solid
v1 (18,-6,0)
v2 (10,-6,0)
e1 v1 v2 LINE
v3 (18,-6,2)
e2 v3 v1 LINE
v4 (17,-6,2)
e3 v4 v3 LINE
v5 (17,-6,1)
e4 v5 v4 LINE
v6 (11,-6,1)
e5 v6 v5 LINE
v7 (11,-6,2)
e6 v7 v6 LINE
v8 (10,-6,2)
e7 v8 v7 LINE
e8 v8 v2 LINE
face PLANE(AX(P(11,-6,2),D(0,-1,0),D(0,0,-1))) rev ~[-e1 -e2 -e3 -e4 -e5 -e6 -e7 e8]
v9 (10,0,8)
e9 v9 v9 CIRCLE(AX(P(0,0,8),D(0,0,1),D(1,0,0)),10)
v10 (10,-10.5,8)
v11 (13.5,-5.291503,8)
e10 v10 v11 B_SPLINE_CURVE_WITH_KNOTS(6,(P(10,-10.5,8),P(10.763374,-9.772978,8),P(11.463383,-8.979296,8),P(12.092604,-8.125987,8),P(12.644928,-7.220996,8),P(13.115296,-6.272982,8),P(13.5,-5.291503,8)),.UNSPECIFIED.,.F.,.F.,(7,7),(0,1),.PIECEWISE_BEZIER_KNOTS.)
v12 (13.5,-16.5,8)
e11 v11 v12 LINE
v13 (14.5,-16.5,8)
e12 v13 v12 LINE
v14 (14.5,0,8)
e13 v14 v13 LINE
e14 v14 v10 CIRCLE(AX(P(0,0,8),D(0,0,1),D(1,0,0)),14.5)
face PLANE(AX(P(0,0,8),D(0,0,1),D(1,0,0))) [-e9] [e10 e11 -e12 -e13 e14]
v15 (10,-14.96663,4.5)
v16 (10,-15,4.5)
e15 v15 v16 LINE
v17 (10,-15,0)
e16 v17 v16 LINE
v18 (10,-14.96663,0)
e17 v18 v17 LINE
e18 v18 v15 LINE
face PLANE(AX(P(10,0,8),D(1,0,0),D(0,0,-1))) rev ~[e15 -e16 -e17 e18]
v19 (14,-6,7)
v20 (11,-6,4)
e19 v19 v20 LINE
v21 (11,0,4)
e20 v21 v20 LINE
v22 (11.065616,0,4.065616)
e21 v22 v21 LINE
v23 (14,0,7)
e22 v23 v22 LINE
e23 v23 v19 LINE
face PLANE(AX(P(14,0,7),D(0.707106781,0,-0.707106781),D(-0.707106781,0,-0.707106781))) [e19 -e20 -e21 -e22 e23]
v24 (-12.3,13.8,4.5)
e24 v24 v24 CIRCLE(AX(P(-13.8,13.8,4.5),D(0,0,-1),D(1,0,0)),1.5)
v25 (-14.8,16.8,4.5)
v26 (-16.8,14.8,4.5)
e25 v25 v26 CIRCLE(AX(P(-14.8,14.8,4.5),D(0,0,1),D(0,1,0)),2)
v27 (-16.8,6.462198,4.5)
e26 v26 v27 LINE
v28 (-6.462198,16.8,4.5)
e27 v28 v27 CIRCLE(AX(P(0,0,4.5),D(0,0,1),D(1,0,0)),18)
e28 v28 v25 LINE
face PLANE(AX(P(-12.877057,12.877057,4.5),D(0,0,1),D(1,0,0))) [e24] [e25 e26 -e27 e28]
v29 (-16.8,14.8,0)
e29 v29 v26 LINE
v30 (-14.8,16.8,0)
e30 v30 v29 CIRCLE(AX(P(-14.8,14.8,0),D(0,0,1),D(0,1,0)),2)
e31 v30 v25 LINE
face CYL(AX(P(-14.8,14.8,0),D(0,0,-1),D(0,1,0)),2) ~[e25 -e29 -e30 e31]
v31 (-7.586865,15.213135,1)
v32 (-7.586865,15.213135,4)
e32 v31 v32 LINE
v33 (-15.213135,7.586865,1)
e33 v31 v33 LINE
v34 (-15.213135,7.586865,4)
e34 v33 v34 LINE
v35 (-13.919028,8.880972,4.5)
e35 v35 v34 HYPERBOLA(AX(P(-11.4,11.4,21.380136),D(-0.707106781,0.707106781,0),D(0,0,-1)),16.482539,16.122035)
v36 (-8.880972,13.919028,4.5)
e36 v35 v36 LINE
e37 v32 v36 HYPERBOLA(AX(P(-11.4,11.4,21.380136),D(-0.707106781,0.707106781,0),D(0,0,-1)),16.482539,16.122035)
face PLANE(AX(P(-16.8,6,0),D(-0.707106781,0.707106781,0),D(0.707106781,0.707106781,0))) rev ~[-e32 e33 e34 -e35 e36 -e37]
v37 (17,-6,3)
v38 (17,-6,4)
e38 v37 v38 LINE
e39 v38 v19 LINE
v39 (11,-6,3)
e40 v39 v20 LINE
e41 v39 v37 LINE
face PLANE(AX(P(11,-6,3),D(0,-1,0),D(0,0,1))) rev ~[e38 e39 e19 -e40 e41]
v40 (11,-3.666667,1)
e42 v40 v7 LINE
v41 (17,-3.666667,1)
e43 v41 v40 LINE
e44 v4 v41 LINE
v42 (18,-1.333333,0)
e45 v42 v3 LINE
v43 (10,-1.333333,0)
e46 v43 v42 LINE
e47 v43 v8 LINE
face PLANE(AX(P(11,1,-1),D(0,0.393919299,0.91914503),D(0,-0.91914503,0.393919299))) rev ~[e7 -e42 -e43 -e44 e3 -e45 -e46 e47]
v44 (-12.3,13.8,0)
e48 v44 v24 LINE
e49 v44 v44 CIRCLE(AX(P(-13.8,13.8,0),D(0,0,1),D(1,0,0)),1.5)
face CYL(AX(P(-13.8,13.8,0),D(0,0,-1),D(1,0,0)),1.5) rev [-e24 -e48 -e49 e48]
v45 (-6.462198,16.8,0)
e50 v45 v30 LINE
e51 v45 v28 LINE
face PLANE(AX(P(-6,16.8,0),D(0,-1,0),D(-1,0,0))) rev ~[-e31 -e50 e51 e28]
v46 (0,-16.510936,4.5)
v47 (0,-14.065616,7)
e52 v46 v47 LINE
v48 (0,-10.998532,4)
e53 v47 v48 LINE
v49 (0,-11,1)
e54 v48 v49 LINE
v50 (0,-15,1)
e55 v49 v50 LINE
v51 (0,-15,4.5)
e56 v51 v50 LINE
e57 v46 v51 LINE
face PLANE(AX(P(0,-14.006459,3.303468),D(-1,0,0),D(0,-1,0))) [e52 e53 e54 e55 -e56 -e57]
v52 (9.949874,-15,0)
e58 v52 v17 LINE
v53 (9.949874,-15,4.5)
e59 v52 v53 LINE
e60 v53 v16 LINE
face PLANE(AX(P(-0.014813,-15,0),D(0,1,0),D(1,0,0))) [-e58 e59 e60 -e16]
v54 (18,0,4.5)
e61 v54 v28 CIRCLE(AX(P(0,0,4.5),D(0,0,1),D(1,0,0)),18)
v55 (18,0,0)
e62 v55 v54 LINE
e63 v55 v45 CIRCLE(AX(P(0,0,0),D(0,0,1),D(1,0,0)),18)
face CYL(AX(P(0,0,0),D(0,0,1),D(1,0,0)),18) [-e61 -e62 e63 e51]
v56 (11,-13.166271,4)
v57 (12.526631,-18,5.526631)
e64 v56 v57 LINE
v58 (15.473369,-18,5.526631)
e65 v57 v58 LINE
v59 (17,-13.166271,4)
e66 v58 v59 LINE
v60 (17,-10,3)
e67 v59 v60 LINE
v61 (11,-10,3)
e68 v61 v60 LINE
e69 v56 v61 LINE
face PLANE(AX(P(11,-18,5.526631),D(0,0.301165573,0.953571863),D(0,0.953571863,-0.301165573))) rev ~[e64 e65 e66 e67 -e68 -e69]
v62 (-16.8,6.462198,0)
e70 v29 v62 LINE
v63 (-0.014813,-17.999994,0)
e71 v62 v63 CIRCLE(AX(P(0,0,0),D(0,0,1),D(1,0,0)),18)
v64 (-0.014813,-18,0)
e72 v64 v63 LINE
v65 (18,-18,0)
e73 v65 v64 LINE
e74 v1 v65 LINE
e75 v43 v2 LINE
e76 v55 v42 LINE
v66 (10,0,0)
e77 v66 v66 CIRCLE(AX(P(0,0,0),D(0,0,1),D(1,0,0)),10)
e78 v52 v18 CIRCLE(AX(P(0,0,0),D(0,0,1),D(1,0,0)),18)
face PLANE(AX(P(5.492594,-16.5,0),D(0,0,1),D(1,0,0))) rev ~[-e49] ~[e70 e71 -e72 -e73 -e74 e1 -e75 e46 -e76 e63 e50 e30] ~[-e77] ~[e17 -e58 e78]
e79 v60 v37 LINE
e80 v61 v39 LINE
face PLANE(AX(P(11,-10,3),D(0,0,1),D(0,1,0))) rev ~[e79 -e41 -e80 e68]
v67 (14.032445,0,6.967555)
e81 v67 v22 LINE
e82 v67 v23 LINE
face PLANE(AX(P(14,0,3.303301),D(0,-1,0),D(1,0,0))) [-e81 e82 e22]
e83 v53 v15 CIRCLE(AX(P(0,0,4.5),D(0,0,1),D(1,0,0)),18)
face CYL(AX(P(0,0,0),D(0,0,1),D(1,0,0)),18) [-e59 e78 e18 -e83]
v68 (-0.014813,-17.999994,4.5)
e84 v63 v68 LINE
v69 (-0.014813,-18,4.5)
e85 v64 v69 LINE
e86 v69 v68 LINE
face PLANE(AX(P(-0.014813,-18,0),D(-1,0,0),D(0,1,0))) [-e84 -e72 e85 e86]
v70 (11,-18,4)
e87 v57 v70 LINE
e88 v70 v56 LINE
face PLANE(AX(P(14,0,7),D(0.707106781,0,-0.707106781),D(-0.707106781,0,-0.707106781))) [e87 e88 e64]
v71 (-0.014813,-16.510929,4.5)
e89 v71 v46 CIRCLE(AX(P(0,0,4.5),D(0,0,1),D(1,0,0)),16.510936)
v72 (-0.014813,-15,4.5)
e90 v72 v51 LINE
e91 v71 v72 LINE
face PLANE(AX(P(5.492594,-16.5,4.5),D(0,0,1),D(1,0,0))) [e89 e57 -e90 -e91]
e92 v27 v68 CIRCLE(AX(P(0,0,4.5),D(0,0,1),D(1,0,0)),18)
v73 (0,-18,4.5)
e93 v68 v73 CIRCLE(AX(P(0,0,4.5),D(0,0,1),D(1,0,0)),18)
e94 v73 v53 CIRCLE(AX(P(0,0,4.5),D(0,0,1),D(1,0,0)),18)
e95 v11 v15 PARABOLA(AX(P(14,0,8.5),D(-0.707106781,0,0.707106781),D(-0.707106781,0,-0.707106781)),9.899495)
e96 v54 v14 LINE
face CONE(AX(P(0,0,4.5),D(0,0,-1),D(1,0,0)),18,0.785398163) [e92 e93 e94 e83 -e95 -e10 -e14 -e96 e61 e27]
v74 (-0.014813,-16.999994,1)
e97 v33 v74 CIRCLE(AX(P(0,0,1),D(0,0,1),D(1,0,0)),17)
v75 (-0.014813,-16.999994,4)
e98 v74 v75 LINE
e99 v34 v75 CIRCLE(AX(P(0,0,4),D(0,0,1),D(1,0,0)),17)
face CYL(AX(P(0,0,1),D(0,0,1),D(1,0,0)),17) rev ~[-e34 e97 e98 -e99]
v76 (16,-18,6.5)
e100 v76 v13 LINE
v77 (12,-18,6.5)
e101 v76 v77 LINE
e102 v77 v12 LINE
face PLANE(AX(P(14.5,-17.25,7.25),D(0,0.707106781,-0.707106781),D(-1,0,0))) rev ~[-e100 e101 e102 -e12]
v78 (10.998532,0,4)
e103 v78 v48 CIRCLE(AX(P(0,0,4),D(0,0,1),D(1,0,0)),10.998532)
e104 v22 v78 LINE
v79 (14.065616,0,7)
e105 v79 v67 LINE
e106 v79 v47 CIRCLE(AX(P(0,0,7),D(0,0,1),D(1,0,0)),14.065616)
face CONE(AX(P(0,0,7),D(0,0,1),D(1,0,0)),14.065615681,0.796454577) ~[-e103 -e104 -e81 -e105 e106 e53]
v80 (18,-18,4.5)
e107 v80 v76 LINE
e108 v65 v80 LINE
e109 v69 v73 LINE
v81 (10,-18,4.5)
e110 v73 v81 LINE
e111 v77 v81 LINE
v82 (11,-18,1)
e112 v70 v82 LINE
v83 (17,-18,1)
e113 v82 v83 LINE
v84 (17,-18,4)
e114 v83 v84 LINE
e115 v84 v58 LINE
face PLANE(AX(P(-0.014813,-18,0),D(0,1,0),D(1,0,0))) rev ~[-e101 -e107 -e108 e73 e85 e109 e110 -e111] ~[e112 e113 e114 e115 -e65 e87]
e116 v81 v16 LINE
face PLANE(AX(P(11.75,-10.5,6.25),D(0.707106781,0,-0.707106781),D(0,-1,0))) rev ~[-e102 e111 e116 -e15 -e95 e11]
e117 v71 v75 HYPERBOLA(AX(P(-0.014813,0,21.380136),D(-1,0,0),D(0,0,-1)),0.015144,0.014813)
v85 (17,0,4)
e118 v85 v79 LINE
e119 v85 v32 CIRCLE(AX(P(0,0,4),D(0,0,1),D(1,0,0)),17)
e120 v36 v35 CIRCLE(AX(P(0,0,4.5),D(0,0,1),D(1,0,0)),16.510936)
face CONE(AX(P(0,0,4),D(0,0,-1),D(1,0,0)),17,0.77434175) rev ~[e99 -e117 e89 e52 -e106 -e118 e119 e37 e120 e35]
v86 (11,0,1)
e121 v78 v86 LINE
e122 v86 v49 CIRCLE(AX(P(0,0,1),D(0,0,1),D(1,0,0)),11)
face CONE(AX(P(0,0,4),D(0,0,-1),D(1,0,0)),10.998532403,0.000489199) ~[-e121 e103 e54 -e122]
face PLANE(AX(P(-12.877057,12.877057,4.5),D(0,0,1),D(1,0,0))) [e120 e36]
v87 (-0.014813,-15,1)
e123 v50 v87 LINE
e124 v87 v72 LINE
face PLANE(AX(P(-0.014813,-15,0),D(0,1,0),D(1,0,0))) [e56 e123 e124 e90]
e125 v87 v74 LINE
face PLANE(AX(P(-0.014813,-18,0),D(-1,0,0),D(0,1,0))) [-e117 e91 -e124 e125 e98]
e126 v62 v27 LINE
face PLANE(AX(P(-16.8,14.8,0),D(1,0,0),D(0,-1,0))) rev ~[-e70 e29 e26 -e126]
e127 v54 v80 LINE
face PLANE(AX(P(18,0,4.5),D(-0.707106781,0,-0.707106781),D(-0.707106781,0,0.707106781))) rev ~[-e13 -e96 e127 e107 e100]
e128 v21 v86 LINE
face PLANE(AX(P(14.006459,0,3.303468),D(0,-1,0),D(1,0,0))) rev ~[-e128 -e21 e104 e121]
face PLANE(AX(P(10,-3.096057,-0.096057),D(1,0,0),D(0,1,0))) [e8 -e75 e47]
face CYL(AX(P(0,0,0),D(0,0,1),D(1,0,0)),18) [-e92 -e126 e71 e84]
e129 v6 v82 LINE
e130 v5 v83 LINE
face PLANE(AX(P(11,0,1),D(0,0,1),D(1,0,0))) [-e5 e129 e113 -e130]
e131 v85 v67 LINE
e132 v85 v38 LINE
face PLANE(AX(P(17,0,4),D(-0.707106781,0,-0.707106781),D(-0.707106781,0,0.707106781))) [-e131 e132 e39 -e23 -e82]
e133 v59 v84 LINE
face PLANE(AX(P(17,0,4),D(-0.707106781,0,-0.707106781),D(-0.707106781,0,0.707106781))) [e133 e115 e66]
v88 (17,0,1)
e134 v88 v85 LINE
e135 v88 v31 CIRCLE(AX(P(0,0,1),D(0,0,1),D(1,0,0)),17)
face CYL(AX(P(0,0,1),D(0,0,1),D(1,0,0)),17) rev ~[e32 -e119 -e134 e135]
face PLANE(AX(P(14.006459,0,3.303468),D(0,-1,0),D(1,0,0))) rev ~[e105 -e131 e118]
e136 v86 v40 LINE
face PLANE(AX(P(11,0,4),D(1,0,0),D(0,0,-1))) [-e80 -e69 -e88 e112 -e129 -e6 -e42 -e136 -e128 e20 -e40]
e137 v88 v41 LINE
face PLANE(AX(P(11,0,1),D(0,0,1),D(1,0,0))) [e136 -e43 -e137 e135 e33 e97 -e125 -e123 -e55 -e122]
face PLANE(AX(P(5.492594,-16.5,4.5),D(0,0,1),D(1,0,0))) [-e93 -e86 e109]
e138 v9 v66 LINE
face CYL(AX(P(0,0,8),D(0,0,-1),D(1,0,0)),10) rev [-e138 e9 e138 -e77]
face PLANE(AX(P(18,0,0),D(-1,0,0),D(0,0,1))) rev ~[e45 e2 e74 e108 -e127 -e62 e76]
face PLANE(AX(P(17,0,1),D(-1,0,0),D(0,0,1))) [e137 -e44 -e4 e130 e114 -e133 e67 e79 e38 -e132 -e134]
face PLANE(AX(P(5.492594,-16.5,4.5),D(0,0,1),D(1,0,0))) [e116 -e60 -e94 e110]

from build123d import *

# Parameters (mm, degrees)
F7_DEPTH       = 18
F8_ANGLE       = 270
F9_DEPTH       = 18
F15_DEPTH      = 6
F16_DEPTH      = 7
F16_DEPTH_BACK = 1
F17_T4_DEPTH   = 22.2867319519
F20_DEPTH      = 4.5
F19_R          = 1.5
F21_DEPTH      = 5
F23_W          = 11.0148127368
F23_H          = 3
F24_DEPTH      = 4.5
F25_SIZE       = 3.5
F26_SIZE       = 1.5


# Not quite as in the source:
# - a fillet or chamfer that OpenCascade refuses, or shapes differently, is made with other operations: its cross-section is extruded or revolved along the edge and cut away or added


with BuildPart() as f5:
    # F0 (on Front) → F5 (revolve)
    with BuildSketch(Plane.XZ):
        Polygon((10, 0), (18, 0), (18, 4.5), (14.5, 8), (10, 8), align=None)
    revolve(axis=Axis((0, 0, 0), (0, 0, 1)))

    # F1 (on Front) → F7 (join)
    with BuildSketch(Plane.XZ):
        Polygon((10, 0), (18, 0), (18, 4.5), (14.5, 8), (10, 8), align=None)
    extrude(amount=F7_DEPTH)


with BuildPart() as f8:
    # F2 (on Front) → F8 (revolve)
    with BuildSketch(Plane.XZ):
        Polygon((10.9985324027, 3.999999641), (11, 1), (17, 1), (17, 4), (14.0656156805, 7), align=None)
    revolve(axis=Axis((0, 0, 0), (0, 0, 1)), revolution_arc=F8_ANGLE)


with BuildPart() as f9:
    # F3 (on Front) → F9 (new body)
    with BuildSketch(Plane.XZ):
        Polygon((11, 4), (11, 1), (17, 1), (17, 4), (14, 7), align=None)
    extrude(amount=F9_DEPTH)


with BuildPart() as f5_1:
    add(f5.part)

    # F10: cut F8
    add(f8.part, mode=Mode.SUBTRACT)

    # F11: cut F9
    add(f9.part, mode=Mode.SUBTRACT)

    # F13 (on offset) → F15 (join)
    with BuildSketch(Plane.YZ.offset(11)):
        Polygon((-6, 7), (-18, 7), (-18, 5.5266313693), (-10, 3), (-6, 3), align=None)
    extrude(amount=F15_DEPTH)

    # F17: chamfer of 2 on 1 edges, made by hand


with BuildPart() as f16:
    # F14 (on offset) → F16 (new body, two sides)
    with BuildSketch(Plane.YZ.offset(11)) as f16_sk:
        Polygon((1, -1), (-6, 2), (-6, -1), align=None)
    extrude(amount=F16_DEPTH)
    extrude(f16_sk.sketch, amount=-F16_DEPTH_BACK)


with BuildPart() as f17_tool2:
    # F17_s3 → F17_t4 (new body)
    with BuildSketch(Plane.XZ.offset(0.8566340241)):
        Polygon((15, 7), (17, 5), (17, 7), align=None)
    extrude(amount=F17_T4_DEPTH)

    split(bisect_by=Plane(origin=(11.25, 0, 11.25), x_dir=(0, 1, 0), z_dir=(0.7071067812, 0, 0.7071067812)), keep=Keep.TOP)


with BuildPart() as f5_2:
    add(f5_1.part)

    # F17_t1: cut F17_tool2
    add(f17_tool2.part, mode=Mode.SUBTRACT)

    # F18: cut F16
    add(f16.part, mode=Mode.SUBTRACT)

    # F6 (on Top) → F20 (join)
    with BuildSketch(Plane.XY):
        with BuildLine():
            Line((-6, 16.8), (-14.8, 16.8))
            ThreePointArc((-14.8, 16.8), (-16.2142135624, 16.2142135624), (-16.8, 14.8))
            Line((-16.8, 14.8), (-16.8, 6))
            Line((-16.8, 6), (-6, 16.8))
        make_face()
    extrude(amount=F20_DEPTH)


with BuildPart() as f21:
    # F19 (on Top) → F21 (new body)
    with BuildSketch(Plane.XY):
        with Locations((-13.8, 13.8)):
            Circle(F19_R)
    extrude(amount=F21_DEPTH)


with BuildPart() as f5_3:
    add(f5_2.part)

    # F22: cut F21
    add(f21.part, mode=Mode.SUBTRACT)

    # F23 (on Top) → F24 (join)
    with BuildSketch(Plane.XY):
        with Locations((5.4925936316, -16.5)):
            Rectangle(F23_W, F23_H)
    extrude(amount=F24_DEPTH)

    # F25
    f25_edges = [f5_3.edges().sort_by_distance(p)[0] for p in [
        (10, -14.25, 8),
    ]]
    chamfer(f25_edges, length=F25_SIZE)

    # F26
    f26_edges = [f5_3.edges().sort_by_distance(p)[0] for p in [
        (14, -18, 8),
    ]]
    chamfer(f26_edges, length=F26_SIZE)


solid = f5_3.part
